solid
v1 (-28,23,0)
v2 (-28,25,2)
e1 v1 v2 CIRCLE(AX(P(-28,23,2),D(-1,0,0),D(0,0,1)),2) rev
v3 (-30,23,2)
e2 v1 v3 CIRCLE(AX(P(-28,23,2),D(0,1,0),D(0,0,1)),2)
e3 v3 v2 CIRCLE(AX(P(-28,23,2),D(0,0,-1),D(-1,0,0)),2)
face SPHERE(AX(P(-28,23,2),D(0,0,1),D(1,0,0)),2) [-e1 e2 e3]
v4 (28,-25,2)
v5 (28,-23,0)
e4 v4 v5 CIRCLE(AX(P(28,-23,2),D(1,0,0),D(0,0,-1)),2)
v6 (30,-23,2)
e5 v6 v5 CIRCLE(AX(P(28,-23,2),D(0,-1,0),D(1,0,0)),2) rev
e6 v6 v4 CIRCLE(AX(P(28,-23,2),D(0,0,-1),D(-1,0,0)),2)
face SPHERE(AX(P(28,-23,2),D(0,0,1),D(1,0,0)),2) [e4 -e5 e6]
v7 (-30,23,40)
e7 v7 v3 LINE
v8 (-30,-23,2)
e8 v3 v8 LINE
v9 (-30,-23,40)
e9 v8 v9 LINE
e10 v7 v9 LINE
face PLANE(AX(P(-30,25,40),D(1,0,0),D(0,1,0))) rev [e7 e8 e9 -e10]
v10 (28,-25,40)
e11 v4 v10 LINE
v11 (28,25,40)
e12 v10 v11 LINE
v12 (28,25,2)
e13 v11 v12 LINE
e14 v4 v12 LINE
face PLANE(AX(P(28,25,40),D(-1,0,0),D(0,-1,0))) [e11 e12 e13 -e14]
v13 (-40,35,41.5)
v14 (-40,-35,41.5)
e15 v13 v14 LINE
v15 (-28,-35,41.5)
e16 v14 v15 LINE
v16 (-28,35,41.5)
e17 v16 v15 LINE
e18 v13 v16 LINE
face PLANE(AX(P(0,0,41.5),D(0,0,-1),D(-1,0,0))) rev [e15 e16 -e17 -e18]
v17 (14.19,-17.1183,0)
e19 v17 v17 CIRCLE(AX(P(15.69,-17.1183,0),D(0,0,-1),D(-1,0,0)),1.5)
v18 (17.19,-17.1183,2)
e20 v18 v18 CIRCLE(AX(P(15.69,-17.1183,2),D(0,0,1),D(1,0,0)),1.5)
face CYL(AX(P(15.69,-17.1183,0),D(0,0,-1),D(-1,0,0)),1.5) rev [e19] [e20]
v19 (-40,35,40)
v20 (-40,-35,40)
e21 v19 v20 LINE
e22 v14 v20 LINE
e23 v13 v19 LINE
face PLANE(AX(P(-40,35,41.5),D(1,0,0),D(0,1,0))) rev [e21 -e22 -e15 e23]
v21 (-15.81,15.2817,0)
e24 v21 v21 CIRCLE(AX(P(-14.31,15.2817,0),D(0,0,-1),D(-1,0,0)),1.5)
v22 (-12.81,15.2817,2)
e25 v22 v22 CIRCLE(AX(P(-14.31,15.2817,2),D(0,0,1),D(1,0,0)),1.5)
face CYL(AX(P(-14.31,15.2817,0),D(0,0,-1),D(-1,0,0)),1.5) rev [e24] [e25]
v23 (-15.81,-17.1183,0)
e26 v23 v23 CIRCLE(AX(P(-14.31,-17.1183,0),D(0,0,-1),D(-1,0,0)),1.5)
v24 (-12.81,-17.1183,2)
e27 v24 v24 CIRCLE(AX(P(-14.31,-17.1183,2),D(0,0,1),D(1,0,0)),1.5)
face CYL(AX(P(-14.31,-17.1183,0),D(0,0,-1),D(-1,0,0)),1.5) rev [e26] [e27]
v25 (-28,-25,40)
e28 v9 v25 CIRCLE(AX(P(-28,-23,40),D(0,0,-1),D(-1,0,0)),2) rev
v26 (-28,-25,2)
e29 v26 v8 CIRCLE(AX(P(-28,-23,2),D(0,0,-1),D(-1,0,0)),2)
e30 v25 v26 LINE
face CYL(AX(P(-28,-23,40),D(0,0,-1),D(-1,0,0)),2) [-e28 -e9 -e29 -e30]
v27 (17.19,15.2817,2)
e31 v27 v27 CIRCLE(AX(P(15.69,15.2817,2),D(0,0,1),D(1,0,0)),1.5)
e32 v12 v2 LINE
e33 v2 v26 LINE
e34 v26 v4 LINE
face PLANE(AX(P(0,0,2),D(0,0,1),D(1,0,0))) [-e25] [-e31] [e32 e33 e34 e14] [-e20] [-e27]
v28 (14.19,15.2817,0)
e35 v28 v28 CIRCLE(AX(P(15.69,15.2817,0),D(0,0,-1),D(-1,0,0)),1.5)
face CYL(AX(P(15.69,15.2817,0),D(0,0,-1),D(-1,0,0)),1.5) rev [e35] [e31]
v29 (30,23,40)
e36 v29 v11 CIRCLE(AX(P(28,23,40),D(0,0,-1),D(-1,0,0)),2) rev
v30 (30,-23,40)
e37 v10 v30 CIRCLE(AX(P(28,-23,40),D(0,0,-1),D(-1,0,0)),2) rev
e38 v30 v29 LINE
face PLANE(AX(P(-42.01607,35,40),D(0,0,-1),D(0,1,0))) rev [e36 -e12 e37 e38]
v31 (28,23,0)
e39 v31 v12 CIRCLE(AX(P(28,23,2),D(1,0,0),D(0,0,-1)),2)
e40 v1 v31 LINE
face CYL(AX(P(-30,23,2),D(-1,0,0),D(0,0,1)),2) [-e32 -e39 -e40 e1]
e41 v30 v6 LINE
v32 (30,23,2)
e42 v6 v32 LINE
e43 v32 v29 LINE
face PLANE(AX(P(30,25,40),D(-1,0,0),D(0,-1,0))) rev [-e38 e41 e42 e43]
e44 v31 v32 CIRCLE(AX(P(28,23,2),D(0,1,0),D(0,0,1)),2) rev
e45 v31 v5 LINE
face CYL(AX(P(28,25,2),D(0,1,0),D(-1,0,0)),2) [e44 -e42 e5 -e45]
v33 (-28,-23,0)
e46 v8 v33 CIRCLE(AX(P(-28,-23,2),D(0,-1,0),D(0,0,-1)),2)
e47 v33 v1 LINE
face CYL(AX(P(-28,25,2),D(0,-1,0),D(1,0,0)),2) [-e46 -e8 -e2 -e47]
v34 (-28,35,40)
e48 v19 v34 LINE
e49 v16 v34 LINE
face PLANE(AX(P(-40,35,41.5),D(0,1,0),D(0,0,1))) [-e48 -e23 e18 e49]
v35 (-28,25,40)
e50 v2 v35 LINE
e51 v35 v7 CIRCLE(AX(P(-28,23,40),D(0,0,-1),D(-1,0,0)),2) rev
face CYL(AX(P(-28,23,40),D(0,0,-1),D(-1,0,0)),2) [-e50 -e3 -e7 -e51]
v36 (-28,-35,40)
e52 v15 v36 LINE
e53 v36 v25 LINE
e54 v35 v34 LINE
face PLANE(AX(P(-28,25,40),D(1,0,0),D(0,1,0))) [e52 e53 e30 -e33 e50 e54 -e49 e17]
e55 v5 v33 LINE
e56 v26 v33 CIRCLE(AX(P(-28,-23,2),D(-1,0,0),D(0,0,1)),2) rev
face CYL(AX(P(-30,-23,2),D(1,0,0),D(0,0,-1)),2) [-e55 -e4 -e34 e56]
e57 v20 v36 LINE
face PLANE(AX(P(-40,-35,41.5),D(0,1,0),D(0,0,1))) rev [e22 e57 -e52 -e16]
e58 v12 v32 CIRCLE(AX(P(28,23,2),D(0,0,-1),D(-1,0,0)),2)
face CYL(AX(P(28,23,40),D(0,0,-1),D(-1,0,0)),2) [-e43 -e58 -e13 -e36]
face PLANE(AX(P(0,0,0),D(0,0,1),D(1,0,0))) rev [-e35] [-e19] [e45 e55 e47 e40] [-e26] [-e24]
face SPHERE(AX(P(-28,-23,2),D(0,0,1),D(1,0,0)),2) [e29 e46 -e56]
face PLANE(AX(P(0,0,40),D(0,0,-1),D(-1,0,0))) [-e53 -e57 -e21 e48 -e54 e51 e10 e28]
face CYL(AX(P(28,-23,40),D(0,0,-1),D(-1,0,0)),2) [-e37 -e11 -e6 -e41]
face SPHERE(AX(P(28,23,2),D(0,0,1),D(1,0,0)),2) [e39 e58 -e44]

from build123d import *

# Parameters (mm, degrees)
SKETCH1_W                 = 60
SKETCH1_H                 = 50
BOSS_EXTRUDE1_DEPTH       = 40
SKETCH2_W                 = 70
SKETCH2_H                 = 70
BOSS_EXTRUDE2_DEPTH       = 1.5
SHELL1_START              = -28
SHELL1_OUTLINE_W          = 46
SHELL1_OUTLINE_H          = 39.5
SHELL1_DEPTH              = 56
F_3_0MM_DOWEL_HOLE2_D     = 3
F_3_0MM_DOWEL_HOLE2_DEPTH = 41.499
FILLET1_R                 = 2
CUT_EXTRUDE2_DEPTH        = 84.200060096
CUT_EXTRUDE2_DEPTH_BACK   = 84.200060096
SKETCH8_W                 = 56
SKETCH8_H                 = 39.5
SKETCH9_W                 = 1.5
SKETCH9_H                 = 70
CUT_EXTRUDE3_DEPTH        = 2


# Read off the part's stored shape, not the designer's step: Shell1
with BuildPart() as part:
    # Sketch1 → Boss-Extrude1 (new body)
    with BuildSketch(Plane.XY):
        Rectangle(SKETCH1_W, SKETCH1_H)
    extrude(amount=BOSS_EXTRUDE1_DEPTH)

    # Sketch2 → Boss-Extrude2 (add)
    with BuildSketch(Plane.XY.offset(40)):
        with Locations((-5, 0)):
            Rectangle(SKETCH2_W, SKETCH2_H)
    extrude(amount=BOSS_EXTRUDE2_DEPTH)

    # Shell1 outline → Shell1 (cut)
    with BuildSketch(Plane.YZ.offset(SHELL1_START)):
        with Locations((0, 21.75)):
            Rectangle(SHELL1_OUTLINE_W, SHELL1_OUTLINE_H)
    extrude(amount=SHELL1_DEPTH, mode=Mode.SUBTRACT)

    # Ø3.0mm Dowel Hole2
    with Locations(Plane(origin=(-311.781139065, -231.688044449, 0), x_dir=(-1, 0, 0), z_dir=(0, 0, -1))):
        with Locations((-327.471139065, 246.969744449), (-297.471139065, 246.969744449), (-297.471139065, 214.569744449), (-327.471139065, 214.569744449)):
            Hole(F_3_0MM_DOWEL_HOLE2_D / 2, depth=F_3_0MM_DOWEL_HOLE2_DEPTH)

    # Fillet1
    fillet1_edges = [part.edges().sort_by_distance(p)[0] for p in [
        (0, -25, 0),
        (-30, 0, 0),
        (0, 25, 0),
        (30, 0, 0),
        (30, -25, 20),
        (-30, -25, 20),
        (-30, 25, 20),
        (30, 25, 20),
    ]]
    fillet(fillet1_edges, radius=FILLET1_R)

    # Sketch8 → Cut-Extrude2 (cut, two sides: drawn at the far end of the back side and taken through both)
    with BuildSketch(Plane.XZ.offset(25).offset(-CUT_EXTRUDE2_DEPTH_BACK)):
        with Locations((0, 21.75)):
            Rectangle(SKETCH8_W, SKETCH8_H)
    extrude(amount=CUT_EXTRUDE2_DEPTH + CUT_EXTRUDE2_DEPTH_BACK, mode=Mode.SUBTRACT)

    # Sketch9 → Cut-Extrude3 (cut)
    with BuildSketch(Plane(origin=(30, 0, 0), x_dir=(0, 0, -1), z_dir=(1, 0, 0))):
        with Locations((-40.75, 0)):
            Rectangle(SKETCH9_W, SKETCH9_H)
    extrude(amount=-CUT_EXTRUDE3_DEPTH, mode=Mode.SUBTRACT)


solid = part.part
